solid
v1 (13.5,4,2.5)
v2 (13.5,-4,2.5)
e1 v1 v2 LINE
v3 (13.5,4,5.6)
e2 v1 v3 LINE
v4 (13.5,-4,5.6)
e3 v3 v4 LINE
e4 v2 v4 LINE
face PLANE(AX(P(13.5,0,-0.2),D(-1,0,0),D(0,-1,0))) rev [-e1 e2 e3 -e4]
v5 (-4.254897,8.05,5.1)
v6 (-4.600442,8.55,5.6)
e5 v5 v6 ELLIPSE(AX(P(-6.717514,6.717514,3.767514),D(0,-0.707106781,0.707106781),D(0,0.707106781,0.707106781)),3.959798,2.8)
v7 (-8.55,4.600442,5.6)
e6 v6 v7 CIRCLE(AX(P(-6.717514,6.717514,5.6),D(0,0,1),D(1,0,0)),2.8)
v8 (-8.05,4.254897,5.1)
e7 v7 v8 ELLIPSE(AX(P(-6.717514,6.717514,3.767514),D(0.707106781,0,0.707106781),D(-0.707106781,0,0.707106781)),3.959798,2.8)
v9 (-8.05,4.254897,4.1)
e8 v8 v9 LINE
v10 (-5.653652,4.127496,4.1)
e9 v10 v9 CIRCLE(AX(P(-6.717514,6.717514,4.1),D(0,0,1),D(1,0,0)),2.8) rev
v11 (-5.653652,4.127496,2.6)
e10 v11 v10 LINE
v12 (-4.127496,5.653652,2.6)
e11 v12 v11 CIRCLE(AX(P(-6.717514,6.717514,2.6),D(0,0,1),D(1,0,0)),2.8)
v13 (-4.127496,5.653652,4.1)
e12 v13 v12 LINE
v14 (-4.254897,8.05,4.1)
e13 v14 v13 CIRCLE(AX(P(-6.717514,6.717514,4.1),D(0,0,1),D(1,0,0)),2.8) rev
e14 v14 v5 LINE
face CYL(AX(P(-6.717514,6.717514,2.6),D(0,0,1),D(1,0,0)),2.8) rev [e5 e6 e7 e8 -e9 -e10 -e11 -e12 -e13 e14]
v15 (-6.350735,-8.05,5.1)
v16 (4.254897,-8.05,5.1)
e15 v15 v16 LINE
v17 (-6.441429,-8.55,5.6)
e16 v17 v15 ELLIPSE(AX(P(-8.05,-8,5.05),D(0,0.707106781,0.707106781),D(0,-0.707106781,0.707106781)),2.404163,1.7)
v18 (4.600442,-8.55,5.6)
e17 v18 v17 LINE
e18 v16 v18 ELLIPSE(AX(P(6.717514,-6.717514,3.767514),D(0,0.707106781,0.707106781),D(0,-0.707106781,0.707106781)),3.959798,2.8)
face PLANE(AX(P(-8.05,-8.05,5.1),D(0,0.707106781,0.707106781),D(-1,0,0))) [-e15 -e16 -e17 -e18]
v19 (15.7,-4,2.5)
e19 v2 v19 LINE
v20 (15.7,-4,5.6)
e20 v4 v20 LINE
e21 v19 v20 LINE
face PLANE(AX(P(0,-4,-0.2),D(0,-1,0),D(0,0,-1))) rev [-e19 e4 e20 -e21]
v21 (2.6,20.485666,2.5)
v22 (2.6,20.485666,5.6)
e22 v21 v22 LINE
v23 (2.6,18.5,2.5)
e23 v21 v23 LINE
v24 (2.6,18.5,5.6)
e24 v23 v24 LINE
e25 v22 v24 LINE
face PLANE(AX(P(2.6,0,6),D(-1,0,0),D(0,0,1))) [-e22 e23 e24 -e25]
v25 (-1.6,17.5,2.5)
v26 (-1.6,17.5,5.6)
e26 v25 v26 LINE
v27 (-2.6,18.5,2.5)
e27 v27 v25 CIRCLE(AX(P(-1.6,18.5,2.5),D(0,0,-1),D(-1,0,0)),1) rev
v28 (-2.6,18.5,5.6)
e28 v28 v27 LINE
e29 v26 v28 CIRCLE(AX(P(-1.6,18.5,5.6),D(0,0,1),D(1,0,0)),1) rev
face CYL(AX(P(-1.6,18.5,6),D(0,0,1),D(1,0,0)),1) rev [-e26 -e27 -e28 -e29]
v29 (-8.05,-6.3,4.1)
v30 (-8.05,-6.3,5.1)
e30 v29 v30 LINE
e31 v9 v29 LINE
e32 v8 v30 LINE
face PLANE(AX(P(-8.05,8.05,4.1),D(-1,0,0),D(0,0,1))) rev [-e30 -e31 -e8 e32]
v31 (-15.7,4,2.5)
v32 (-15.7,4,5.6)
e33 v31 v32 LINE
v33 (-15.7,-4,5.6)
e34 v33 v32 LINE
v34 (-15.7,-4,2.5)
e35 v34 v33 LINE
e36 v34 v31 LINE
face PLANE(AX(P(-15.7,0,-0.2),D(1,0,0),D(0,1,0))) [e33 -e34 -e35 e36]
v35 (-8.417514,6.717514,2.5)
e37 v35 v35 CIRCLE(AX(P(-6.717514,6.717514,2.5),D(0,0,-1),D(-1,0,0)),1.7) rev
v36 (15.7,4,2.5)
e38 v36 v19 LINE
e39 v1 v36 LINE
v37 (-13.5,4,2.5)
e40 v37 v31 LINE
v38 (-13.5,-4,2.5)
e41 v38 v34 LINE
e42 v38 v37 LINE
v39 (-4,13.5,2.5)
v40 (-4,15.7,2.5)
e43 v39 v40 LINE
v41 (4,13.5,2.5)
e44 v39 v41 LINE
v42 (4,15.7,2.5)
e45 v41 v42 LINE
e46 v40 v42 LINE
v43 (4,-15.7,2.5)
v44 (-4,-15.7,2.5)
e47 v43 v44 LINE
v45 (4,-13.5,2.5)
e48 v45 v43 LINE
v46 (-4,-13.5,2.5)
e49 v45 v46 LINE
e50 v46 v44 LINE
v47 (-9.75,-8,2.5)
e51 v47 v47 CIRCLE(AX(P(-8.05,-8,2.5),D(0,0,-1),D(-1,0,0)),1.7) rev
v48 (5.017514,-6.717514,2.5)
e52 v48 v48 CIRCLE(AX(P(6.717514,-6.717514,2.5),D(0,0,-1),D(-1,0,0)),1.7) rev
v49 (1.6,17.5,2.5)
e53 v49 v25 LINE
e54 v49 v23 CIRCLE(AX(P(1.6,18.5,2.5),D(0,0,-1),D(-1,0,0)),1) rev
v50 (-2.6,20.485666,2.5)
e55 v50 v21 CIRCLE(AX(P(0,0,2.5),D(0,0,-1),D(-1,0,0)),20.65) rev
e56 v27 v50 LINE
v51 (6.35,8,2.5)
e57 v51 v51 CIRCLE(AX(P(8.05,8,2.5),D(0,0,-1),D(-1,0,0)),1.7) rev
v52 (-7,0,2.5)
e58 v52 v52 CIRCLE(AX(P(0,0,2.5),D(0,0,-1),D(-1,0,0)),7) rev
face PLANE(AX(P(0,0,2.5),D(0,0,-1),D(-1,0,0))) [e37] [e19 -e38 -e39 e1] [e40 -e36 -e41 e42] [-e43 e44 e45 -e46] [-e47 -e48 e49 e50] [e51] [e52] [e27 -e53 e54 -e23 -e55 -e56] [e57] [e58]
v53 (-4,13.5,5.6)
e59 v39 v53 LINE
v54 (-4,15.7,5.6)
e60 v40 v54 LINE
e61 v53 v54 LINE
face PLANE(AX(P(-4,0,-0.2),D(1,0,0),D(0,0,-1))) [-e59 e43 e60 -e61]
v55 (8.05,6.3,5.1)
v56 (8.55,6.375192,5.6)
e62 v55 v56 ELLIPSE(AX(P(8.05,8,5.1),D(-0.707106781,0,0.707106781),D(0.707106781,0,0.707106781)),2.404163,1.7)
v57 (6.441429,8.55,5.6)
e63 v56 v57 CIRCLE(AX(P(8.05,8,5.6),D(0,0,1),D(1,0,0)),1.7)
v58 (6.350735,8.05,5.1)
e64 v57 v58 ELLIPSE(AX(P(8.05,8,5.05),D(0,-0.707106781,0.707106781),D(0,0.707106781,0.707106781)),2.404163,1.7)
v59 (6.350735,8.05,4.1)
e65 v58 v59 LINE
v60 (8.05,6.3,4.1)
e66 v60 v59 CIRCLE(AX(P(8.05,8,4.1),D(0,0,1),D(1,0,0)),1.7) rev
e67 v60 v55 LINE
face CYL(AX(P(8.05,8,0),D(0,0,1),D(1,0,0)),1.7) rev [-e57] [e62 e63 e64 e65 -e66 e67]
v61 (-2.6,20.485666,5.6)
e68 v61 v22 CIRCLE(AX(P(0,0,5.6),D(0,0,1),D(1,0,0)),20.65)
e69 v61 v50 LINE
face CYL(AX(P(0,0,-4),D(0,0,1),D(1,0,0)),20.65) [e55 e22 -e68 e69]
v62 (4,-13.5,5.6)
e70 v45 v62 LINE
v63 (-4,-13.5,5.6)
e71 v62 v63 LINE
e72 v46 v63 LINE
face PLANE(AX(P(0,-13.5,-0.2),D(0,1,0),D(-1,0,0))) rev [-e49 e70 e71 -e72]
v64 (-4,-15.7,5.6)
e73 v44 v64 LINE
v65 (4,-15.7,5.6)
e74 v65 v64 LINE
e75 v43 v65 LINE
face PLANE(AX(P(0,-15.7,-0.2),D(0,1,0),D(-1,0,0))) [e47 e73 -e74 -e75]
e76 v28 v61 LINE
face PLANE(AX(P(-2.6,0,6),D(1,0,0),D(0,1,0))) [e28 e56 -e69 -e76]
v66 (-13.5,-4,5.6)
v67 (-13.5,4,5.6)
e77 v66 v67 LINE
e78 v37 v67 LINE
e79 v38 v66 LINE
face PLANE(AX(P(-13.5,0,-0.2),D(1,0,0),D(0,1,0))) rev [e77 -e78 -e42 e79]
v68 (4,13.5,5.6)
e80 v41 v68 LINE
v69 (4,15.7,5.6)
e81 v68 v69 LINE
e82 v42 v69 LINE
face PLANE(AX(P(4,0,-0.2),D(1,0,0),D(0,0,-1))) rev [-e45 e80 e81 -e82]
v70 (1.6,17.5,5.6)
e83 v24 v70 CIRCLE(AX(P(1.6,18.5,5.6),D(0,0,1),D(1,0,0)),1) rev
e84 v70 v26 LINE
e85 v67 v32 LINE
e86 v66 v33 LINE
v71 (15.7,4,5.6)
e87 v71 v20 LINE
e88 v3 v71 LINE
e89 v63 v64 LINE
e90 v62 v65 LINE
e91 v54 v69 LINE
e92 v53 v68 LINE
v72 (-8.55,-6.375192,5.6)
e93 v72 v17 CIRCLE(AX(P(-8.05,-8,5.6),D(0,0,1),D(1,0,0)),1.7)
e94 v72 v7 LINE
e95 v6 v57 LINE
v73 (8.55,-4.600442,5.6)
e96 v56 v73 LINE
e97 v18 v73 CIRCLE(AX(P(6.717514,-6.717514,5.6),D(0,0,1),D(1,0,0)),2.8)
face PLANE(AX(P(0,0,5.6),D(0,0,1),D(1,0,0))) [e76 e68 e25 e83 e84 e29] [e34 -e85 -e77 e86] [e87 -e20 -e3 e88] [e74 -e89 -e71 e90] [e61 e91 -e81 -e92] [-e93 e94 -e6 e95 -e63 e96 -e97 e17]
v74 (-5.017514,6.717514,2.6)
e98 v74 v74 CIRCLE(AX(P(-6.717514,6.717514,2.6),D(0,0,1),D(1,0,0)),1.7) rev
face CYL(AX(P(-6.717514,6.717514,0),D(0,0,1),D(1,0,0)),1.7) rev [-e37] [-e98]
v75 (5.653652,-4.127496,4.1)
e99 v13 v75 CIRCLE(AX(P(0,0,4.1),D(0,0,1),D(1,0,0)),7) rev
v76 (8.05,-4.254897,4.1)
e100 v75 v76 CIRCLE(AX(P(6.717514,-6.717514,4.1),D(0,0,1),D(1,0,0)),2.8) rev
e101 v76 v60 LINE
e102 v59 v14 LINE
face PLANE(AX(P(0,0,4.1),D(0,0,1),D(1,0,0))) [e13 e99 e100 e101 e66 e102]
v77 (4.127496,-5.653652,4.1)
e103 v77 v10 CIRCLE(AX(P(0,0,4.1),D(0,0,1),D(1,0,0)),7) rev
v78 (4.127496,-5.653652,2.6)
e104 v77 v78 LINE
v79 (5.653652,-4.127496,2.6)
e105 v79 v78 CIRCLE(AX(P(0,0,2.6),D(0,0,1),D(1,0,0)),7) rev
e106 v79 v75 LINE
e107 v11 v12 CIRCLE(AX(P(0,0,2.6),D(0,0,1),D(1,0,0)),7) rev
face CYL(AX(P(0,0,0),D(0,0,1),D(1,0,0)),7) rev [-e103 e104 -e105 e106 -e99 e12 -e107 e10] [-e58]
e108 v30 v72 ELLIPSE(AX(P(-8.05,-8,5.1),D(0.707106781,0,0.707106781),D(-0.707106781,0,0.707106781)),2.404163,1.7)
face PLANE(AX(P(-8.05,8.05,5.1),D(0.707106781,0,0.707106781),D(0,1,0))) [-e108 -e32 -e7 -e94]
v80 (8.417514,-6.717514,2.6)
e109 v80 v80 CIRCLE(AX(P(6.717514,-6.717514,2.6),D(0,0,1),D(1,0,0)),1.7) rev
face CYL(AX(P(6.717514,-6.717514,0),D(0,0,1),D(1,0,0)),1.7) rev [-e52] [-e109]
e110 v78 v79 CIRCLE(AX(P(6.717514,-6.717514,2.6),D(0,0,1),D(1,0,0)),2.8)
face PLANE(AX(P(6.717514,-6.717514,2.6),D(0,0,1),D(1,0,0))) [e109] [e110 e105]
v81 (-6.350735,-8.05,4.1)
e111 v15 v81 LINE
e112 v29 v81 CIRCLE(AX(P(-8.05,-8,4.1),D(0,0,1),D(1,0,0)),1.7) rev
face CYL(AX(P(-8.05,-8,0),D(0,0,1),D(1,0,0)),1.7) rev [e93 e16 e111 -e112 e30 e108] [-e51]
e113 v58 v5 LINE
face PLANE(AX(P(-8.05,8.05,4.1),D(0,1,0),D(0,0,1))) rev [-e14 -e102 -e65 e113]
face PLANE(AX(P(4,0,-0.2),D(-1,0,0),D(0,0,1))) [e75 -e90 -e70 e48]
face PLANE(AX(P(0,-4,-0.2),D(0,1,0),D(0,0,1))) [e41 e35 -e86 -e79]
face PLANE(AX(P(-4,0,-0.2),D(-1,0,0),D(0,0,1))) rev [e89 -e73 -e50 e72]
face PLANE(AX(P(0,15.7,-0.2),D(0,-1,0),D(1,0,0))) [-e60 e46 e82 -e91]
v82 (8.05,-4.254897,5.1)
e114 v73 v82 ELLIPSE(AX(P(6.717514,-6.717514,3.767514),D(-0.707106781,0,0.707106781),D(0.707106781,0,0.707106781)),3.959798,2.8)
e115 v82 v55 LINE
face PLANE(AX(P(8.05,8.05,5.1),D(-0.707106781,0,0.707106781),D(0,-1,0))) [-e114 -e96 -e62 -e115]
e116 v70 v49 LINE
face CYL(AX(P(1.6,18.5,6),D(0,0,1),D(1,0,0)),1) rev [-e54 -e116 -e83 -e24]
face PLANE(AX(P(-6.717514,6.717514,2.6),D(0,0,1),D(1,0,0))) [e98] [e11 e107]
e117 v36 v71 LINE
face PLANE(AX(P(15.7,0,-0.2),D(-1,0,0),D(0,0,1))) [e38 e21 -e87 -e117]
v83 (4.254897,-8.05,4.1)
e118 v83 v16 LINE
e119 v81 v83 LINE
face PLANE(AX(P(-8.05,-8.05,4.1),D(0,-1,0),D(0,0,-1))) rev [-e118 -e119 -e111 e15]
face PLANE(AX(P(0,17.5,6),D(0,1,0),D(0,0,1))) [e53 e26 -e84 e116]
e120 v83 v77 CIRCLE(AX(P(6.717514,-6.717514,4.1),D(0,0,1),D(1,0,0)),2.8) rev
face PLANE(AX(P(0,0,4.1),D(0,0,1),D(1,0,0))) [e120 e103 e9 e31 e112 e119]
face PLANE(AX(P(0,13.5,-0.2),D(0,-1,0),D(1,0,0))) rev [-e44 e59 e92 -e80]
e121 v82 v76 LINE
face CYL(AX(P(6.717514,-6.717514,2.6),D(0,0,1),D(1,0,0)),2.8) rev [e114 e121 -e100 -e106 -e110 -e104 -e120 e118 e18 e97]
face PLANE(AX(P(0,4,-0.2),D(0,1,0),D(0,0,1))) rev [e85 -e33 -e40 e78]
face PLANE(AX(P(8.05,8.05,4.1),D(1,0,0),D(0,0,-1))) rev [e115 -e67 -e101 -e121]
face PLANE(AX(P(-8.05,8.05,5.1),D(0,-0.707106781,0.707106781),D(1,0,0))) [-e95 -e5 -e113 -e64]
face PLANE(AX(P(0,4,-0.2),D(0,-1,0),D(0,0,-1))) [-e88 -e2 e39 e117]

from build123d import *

# Parameters (mm, degrees)
SKETCH_1_R               = 17.4
EXTRUDE_1_DEPTH          = 5.6
SKETCH_2_R               = 1.7
CUT_EXTRUDE_1_DEPTH      = 26.23648153
SKETCH_3_R               = 7
CUT_EXTRUDE_2_DEPTH      = 26.23648153
SKETCH_4_R               = 2.8
CUT_EXTRUDE_3_DEPTH      = 3
SKETCH_5_R               = 1.7
CUT_EXTRUDE_4_DEPTH      = 26.23648153
CUT_EXTRUDE_5_DEPTH      = 2.5
SKETCH_7_W               = 16.1
SKETCH_7_H               = 16.1
CUT_EXTRUDE_6_DEPTH      = 1.5
CHAMFER_1_SIZE           = 0.5
SKETCH_9_W               = 2.2
SKETCH_9_H               = 8
SKETCH_9_W_2             = 8
SKETCH_9_H_2             = 2.2
CUT_EXTRUDE_7_DEPTH      = 26.281613873
BOSS_EXTRUDE1_DEPTH      = 5.6
BOSS_EXTRUDE1_DEPTH_BACK = 4
SKETCH1_R                = 20.65
SKETCH1_R_2              = 17.4
SKETCH3_R                = 23
SKETCH3_R_2              = 20.65
BOSS_EXTRUDE2_DEPTH      = 2.5
SKETCH4_R                = 18
CUT_EXTRUDE3_DEPTH       = 4
SKETCH5_W                = 1
SKETCH5_H                = 8
CUT_EXTRUDE4_DEPTH       = 10
CUT_EXTRUDE6_DEPTH       = 10
FILLET3_R                = 1
SKETCH9_R                = 23
CUT_EXTRUDE8_DEPTH       = 6.5


with BuildPart() as part:
    # 草图1 → 凸台-拉伸1 (new body)
    with BuildSketch(Plane.XY):
        Circle(SKETCH_1_R)
    extrude(amount=EXTRUDE_1_DEPTH)

    # 草图2 → 切除-拉伸1 (cut, through all)
    with BuildSketch(Plane.XY.offset(5.6)):
        with Locations((-6.717514421, 6.717514421)):
            Circle(SKETCH_2_R)
        with Locations((6.717514421, -6.717514421)):
            Circle(SKETCH_2_R)
    extrude(amount=-CUT_EXTRUDE_1_DEPTH, mode=Mode.SUBTRACT)

    # 草图3 → 切除-拉伸2 (cut, through all)
    with BuildSketch(Plane.XY.offset(5.6)):
        Circle(SKETCH_3_R)
    extrude(amount=-CUT_EXTRUDE_2_DEPTH, mode=Mode.SUBTRACT)

    # 草图4 → 切除-拉伸3 (cut)
    with BuildSketch(Plane.XY.offset(5.6)):
        with Locations((-6.717514421, 6.717514421)):
            Circle(SKETCH_4_R)
        with Locations((6.717514421, -6.717514421)):
            Circle(SKETCH_4_R)
    extrude(amount=-CUT_EXTRUDE_3_DEPTH, mode=Mode.SUBTRACT)

    # 草图5 → 切除-拉伸4 (cut, through all)
    with BuildSketch(Plane.XY.offset(5.6)):
        with Locations((8.05, 8)):
            Circle(SKETCH_5_R)
        with Locations((-8.05, -8)):
            Circle(SKETCH_5_R)
    extrude(amount=-CUT_EXTRUDE_4_DEPTH, mode=Mode.SUBTRACT)

    # 草图6 → 切除-拉伸5 (cut)
    with BuildSketch(Plane(origin=(0, 0, 0), x_dir=(-1, 0, 0), z_dir=(0, 0, -1))):
        Polygon((4.766838493, -8), (6.408419246, -10.84330127), (9.691580754, -10.84330127), (11.333161507, -8), (9.691580754, -5.15669873), (6.408419246, -5.15669873), align=None)
        Polygon((-4.766838493, 8), (-6.408419246, 10.84330127), (-9.691580754, 10.84330127), (-11.333161507, 8), (-9.691580754, 5.15669873), (-6.408419246, 5.15669873), align=None)
    extrude(amount=-CUT_EXTRUDE_5_DEPTH, mode=Mode.SUBTRACT)

    # 草图7 → 切除-拉伸6 (cut)
    with BuildSketch(Plane.XY.offset(5.6)):
        Rectangle(SKETCH_7_W, SKETCH_7_H)
    extrude(amount=-CUT_EXTRUDE_6_DEPTH, mode=Mode.SUBTRACT)

    # 倒角1
    chamfer_1_edges = [part.edges().sort_by_distance(p)[0] for p in [
        (8.05, 1.022551258, 5.6),
        (1.047918985, 8.05, 5.6),
        (-8.05, -1.022551258, 5.6),
        (-1.047918985, -8.05, 5.6),
    ]]
    chamfer(chamfer_1_edges, length=CHAMFER_1_SIZE)

    # 草图8 → 旋转1 (revolve)
    with BuildSketch(Plane(origin=(0, 0, 0), x_dir=(0, 0, -1), z_dir=(1, 0, 0)), mode=Mode.PRIVATE) as revolve_1_sk:
        Polygon((0, 17.4), (0, 17.2), (0.2, 17.4), align=None)
    revolve(revolve_1_sk.sketch.rotate(Axis((0, 0, 0), (0, 0, 1)), 90), axis=Axis((0, 0, 0), (0, 0, 1)))

    # 草图9 → 切除-拉伸7 (cut, through all)
    with BuildSketch(Plane.XY.offset(5.6)):
        with Locations((14.6, 0)):
            Rectangle(SKETCH_9_W, SKETCH_9_H)
        with Locations((0, 14.6)):
            Rectangle(SKETCH_9_W_2, SKETCH_9_H_2)
        with Locations((-14.6, 0)):
            Rectangle(SKETCH_9_W, SKETCH_9_H)
        with Locations((0, -14.6)):
            Rectangle(SKETCH_9_W_2, SKETCH_9_H_2)
    extrude(amount=-CUT_EXTRUDE_7_DEPTH, mode=Mode.SUBTRACT)

    # Sketch1 → Boss-Extrude1 (add, two sides: drawn at the far end of the back side and taken through both)
    with BuildSketch(Plane.XY.offset(-BOSS_EXTRUDE1_DEPTH_BACK)):
        Circle(SKETCH1_R)
        Circle(SKETCH1_R_2, mode=Mode.SUBTRACT)
    extrude(amount=BOSS_EXTRUDE1_DEPTH + BOSS_EXTRUDE1_DEPTH_BACK)

    # Sketch3 → Boss-Extrude2 (add)
    with BuildSketch(Plane(origin=(0, 0, -4), x_dir=(-1, 0, 0), z_dir=(0, 0, -1))):
        Circle(SKETCH3_R)
        with Locations(Location((0, 0, 0), (0, 0, 180))):
            Circle(SKETCH3_R_2, mode=Mode.SUBTRACT)
    extrude(amount=-BOSS_EXTRUDE2_DEPTH)

    # Sketch4 → Cut-Extrude3 (cut)
    with BuildSketch(Plane(origin=(0, 0, -4), x_dir=(-1, 0, 0), z_dir=(0, 0, -1))):
        Circle(SKETCH4_R)
    extrude(amount=-CUT_EXTRUDE3_DEPTH, mode=Mode.SUBTRACT)

    # Sketch5 → Cut-Extrude4 (cut)
    with BuildSketch(Plane(origin=(0, 0, -4), x_dir=(-1, 0, 0), z_dir=(0, 0, -1))):
        with Locations((22.5, 0)):
            Rectangle(SKETCH5_W, SKETCH5_H)
        with Locations((-22.5, 0)):
            Rectangle(SKETCH5_W, SKETCH5_H)
    extrude(amount=-CUT_EXTRUDE4_DEPTH, mode=Mode.SUBTRACT)

    # Sketch7 → Cut-Extrude6 (cut)
    with BuildSketch(Plane(origin=(0, 0, -4), x_dir=(-1, 0, 0), z_dir=(0, 0, -1))):
        with BuildLine():
            Line((0, 18), (0, 22.3))
            Line((0, 22.3), (-2.6, 22.3))
            Line((-2.6, 22.3), (-2.6, 17.811232411))
            ThreePointArc((-2.6, 17.811232411), (-1.303421766, 17.952746077), (0, 18))
        make_face()
        with BuildLine():
            Line((0, 17.5), (0, 18))
            ThreePointArc((0, 18), (-1.303421766, 17.952746077), (-2.6, 17.811232411))
            Line((-2.6, 17.811232411), (-2.6, 17.5))
            Line((-2.6, 17.5), (0, 17.5))
        make_face()
        with BuildLine():
            Line((2.6, 22.3), (0, 22.3))
            Line((0, 22.3), (0, 18))
            ThreePointArc((0, 18), (1.303421766, 17.952746077), (2.6, 17.811232411))
            Line((2.6, 17.811232411), (2.6, 22.3))
        make_face()
        with BuildLine():
            ThreePointArc((2.6, 17.811232411), (1.303421766, 17.952746077), (0, 18))
            Line((0, 18), (0, 17.5))
            Line((0, 17.5), (2.6, 17.5))
            Line((2.6, 17.5), (2.6, 17.811232411))
        make_face()
    extrude(amount=-CUT_EXTRUDE6_DEPTH, mode=Mode.SUBTRACT)

    # Fillet3
    # the kernel refuses this fillet: 1 mm, written as the material it adds along each edge
    with BuildSketch(Plane(origin=(2.6, 22.3, -4), x_dir=(-1, 0, 0), z_dir=(0, 0, 1))) as fillet3_piece_1:
        with BuildLine():
            CenterArc((FILLET3_R, FILLET3_R), FILLET3_R, 180, 90)
            Line((0, FILLET3_R), (-FILLET3_R * 0.02, FILLET3_R))
            Line((-FILLET3_R * 0.02, FILLET3_R), (-FILLET3_R * 0.02, -FILLET3_R * 0.02))
            Line((-FILLET3_R * 0.02, -FILLET3_R * 0.02), (FILLET3_R, -FILLET3_R * 0.02))
            Line((FILLET3_R, -FILLET3_R * 0.02), (FILLET3_R, 0))
        make_face()
    extrude(amount=2.5)
    with BuildSketch(Plane(origin=(-2.6, 22.3, -4), x_dir=(1, 0, 0), z_dir=(0, 0, 1))) as fillet3_piece_2:
        with BuildLine():
            CenterArc((FILLET3_R, -FILLET3_R), FILLET3_R, 90, 90)
            Line((0, -FILLET3_R), (-FILLET3_R * 0.02, -FILLET3_R))
            Line((-FILLET3_R * 0.02, -FILLET3_R), (-FILLET3_R * 0.02, FILLET3_R * 0.02))
            Line((-FILLET3_R * 0.02, FILLET3_R * 0.02), (FILLET3_R, FILLET3_R * 0.02))
            Line((FILLET3_R, FILLET3_R * 0.02), (FILLET3_R, 0))
        make_face()
    extrude(amount=2.5)
    with BuildSketch(Plane(origin=(-2.6, 17.5, -6), x_dir=(0, 1, 0), z_dir=(0, 0, 1))) as fillet3_piece_3_section:
        with BuildLine():
            CenterArc((FILLET3_R, -FILLET3_R), FILLET3_R, 90, 90)
            Line((0, -FILLET3_R), (-FILLET3_R * 0.02, -FILLET3_R))
            Line((-FILLET3_R * 0.02, -FILLET3_R), (-FILLET3_R * 0.02, FILLET3_R * 0.02))
            Line((-FILLET3_R * 0.02, FILLET3_R * 0.02), (FILLET3_R, FILLET3_R * 0.02))
            Line((FILLET3_R, FILLET3_R * 0.02), (FILLET3_R, 0))
        make_face()
    fillet3_piece_3 = extrude(amount=11.6, mode=Mode.PRIVATE)
    fillet3_piece_3 = split(fillet3_piece_3, bisect_by=Plane(origin=(-2.544482942, 18.024809788, 0), z_dir=(0, 0, -1)), keep=Keep.TOP, mode=Mode.PRIVATE)
    fillet3_piece_3 = fillet3_piece_3 - Plane(origin=(0, 0, -2), x_dir=(-1, 0, 0), z_dir=(0, 0, -1)) * Cylinder(18, 28, mode=Mode.PRIVATE)
    fillet3_piece_3 = split(fillet3_piece_3, bisect_by=Plane(origin=(-2.544482942, 18.024809788, -4), z_dir=(0, 0, 1)), keep=Keep.TOP, mode=Mode.PRIVATE)
    add(fillet3_piece_3)
    with BuildSketch(Plane(origin=(-2.6, 17.5, 0), x_dir=(0, 1, 0), z_dir=(0, 0, 1))) as fillet3_piece_4_section:
        with BuildLine():
            CenterArc((FILLET3_R, -FILLET3_R), FILLET3_R, 90, 90)
            Line((0, -FILLET3_R), (-FILLET3_R * 0.02, -FILLET3_R))
            Line((-FILLET3_R * 0.02, -FILLET3_R), (-FILLET3_R * 0.02, FILLET3_R * 0.02))
            Line((-FILLET3_R * 0.02, FILLET3_R * 0.02), (FILLET3_R, FILLET3_R * 0.02))
            Line((FILLET3_R, FILLET3_R * 0.02), (FILLET3_R, 0))
        make_face()
    fillet3_piece_4 = extrude(amount=5.6, mode=Mode.PRIVATE)
    fillet3_piece_4 = fillet3_piece_4 - Plane(origin=(0, 0, 2.8), x_dir=(-1, 0, 0), z_dir=(0, 0, -1)) * Cylinder(18, 16, mode=Mode.PRIVATE)
    add(fillet3_piece_4)
    with BuildSketch(Plane(origin=(-2.6, 17.5, 0), x_dir=(0, 1, 0), z_dir=(0, 0, 1))) as fillet3_piece_5_section:
        with BuildLine():
            CenterArc((FILLET3_R, -FILLET3_R), FILLET3_R, 90, 90)
            Line((0, -FILLET3_R), (-FILLET3_R * 0.02, -FILLET3_R))
            Line((-FILLET3_R * 0.02, -FILLET3_R), (-FILLET3_R * 0.02, FILLET3_R * 0.02))
            Line((-FILLET3_R * 0.02, FILLET3_R * 0.02), (FILLET3_R, FILLET3_R * 0.02))
            Line((FILLET3_R, FILLET3_R * 0.02), (FILLET3_R, 0))
        make_face()
    fillet3_piece_5 = extrude(amount=5.6, mode=Mode.PRIVATE)
    fillet3_piece_5 = fillet3_piece_5 & Plane(origin=(0, 0, 2.8), x_dir=(-1, 0, 0), z_dir=(0, 0, -1)) * Cylinder(18, 16, mode=Mode.PRIVATE)
    add(fillet3_piece_5)
    with BuildSketch(Plane(origin=(2.6, 17.5, -6), x_dir=(-1, 0, 0), z_dir=(0, 0, 1))) as fillet3_piece_6_section:
        with BuildLine():
            CenterArc((FILLET3_R, -FILLET3_R), FILLET3_R, 90, 90)
            Line((0, -FILLET3_R), (-FILLET3_R * 0.02, -FILLET3_R))
            Line((-FILLET3_R * 0.02, -FILLET3_R), (-FILLET3_R * 0.02, FILLET3_R * 0.02))
            Line((-FILLET3_R * 0.02, FILLET3_R * 0.02), (FILLET3_R, FILLET3_R * 0.02))
            Line((FILLET3_R, FILLET3_R * 0.02), (FILLET3_R, 0))
        make_face()
    fillet3_piece_6 = extrude(amount=11.6, mode=Mode.PRIVATE)
    fillet3_piece_6 = split(fillet3_piece_6, bisect_by=Plane(origin=(2.544482942, 18.024809788, 0), z_dir=(0, 0, -1)), keep=Keep.TOP, mode=Mode.PRIVATE)
    fillet3_piece_6 = fillet3_piece_6 - Plane(origin=(0, 0, -2), x_dir=(-1, 0, 0), z_dir=(0, 0, -1)) * Cylinder(18, 28, mode=Mode.PRIVATE)
    fillet3_piece_6 = split(fillet3_piece_6, bisect_by=Plane(origin=(2.544482942, 18.024809788, -4), z_dir=(0, 0, 1)), keep=Keep.TOP, mode=Mode.PRIVATE)
    add(fillet3_piece_6)
    with BuildSketch(Plane(origin=(2.6, 17.5, 0), x_dir=(-1, 0, 0), z_dir=(0, 0, 1))) as fillet3_piece_7_section:
        with BuildLine():
            CenterArc((FILLET3_R, -FILLET3_R), FILLET3_R, 90, 90)
            Line((0, -FILLET3_R), (-FILLET3_R * 0.02, -FILLET3_R))
            Line((-FILLET3_R * 0.02, -FILLET3_R), (-FILLET3_R * 0.02, FILLET3_R * 0.02))
            Line((-FILLET3_R * 0.02, FILLET3_R * 0.02), (FILLET3_R, FILLET3_R * 0.02))
            Line((FILLET3_R, FILLET3_R * 0.02), (FILLET3_R, 0))
        make_face()
    fillet3_piece_7 = extrude(amount=5.6, mode=Mode.PRIVATE)
    fillet3_piece_7 = fillet3_piece_7 & Plane(origin=(0, 0, 2.8), x_dir=(-1, 0, 0), z_dir=(0, 0, -1)) * Cylinder(18, 16, mode=Mode.PRIVATE)
    add(fillet3_piece_7)
    with BuildSketch(Plane(origin=(2.6, 17.5, 0), x_dir=(-1, 0, 0), z_dir=(0, 0, 1))) as fillet3_piece_8_section:
        with BuildLine():
            CenterArc((FILLET3_R, -FILLET3_R), FILLET3_R, 90, 90)
            Line((0, -FILLET3_R), (-FILLET3_R * 0.02, -FILLET3_R))
            Line((-FILLET3_R * 0.02, -FILLET3_R), (-FILLET3_R * 0.02, FILLET3_R * 0.02))
            Line((-FILLET3_R * 0.02, FILLET3_R * 0.02), (FILLET3_R, FILLET3_R * 0.02))
            Line((FILLET3_R, FILLET3_R * 0.02), (FILLET3_R, 0))
        make_face()
    fillet3_piece_8 = extrude(amount=5.6, mode=Mode.PRIVATE)
    fillet3_piece_8 = fillet3_piece_8 - Plane(origin=(0, 0, 2.8), x_dir=(-1, 0, 0), z_dir=(0, 0, -1)) * Cylinder(18, 16, mode=Mode.PRIVATE)
    add(fillet3_piece_8)

    # Sketch9 → Cut-Extrude8 (cut)
    with BuildSketch(Plane(origin=(0, 0, -4), x_dir=(-1, 0, 0), z_dir=(0, 0, -1))):
        Circle(SKETCH9_R)
    extrude(amount=-CUT_EXTRUDE8_DEPTH, mode=Mode.SUBTRACT)


solid = part.part
